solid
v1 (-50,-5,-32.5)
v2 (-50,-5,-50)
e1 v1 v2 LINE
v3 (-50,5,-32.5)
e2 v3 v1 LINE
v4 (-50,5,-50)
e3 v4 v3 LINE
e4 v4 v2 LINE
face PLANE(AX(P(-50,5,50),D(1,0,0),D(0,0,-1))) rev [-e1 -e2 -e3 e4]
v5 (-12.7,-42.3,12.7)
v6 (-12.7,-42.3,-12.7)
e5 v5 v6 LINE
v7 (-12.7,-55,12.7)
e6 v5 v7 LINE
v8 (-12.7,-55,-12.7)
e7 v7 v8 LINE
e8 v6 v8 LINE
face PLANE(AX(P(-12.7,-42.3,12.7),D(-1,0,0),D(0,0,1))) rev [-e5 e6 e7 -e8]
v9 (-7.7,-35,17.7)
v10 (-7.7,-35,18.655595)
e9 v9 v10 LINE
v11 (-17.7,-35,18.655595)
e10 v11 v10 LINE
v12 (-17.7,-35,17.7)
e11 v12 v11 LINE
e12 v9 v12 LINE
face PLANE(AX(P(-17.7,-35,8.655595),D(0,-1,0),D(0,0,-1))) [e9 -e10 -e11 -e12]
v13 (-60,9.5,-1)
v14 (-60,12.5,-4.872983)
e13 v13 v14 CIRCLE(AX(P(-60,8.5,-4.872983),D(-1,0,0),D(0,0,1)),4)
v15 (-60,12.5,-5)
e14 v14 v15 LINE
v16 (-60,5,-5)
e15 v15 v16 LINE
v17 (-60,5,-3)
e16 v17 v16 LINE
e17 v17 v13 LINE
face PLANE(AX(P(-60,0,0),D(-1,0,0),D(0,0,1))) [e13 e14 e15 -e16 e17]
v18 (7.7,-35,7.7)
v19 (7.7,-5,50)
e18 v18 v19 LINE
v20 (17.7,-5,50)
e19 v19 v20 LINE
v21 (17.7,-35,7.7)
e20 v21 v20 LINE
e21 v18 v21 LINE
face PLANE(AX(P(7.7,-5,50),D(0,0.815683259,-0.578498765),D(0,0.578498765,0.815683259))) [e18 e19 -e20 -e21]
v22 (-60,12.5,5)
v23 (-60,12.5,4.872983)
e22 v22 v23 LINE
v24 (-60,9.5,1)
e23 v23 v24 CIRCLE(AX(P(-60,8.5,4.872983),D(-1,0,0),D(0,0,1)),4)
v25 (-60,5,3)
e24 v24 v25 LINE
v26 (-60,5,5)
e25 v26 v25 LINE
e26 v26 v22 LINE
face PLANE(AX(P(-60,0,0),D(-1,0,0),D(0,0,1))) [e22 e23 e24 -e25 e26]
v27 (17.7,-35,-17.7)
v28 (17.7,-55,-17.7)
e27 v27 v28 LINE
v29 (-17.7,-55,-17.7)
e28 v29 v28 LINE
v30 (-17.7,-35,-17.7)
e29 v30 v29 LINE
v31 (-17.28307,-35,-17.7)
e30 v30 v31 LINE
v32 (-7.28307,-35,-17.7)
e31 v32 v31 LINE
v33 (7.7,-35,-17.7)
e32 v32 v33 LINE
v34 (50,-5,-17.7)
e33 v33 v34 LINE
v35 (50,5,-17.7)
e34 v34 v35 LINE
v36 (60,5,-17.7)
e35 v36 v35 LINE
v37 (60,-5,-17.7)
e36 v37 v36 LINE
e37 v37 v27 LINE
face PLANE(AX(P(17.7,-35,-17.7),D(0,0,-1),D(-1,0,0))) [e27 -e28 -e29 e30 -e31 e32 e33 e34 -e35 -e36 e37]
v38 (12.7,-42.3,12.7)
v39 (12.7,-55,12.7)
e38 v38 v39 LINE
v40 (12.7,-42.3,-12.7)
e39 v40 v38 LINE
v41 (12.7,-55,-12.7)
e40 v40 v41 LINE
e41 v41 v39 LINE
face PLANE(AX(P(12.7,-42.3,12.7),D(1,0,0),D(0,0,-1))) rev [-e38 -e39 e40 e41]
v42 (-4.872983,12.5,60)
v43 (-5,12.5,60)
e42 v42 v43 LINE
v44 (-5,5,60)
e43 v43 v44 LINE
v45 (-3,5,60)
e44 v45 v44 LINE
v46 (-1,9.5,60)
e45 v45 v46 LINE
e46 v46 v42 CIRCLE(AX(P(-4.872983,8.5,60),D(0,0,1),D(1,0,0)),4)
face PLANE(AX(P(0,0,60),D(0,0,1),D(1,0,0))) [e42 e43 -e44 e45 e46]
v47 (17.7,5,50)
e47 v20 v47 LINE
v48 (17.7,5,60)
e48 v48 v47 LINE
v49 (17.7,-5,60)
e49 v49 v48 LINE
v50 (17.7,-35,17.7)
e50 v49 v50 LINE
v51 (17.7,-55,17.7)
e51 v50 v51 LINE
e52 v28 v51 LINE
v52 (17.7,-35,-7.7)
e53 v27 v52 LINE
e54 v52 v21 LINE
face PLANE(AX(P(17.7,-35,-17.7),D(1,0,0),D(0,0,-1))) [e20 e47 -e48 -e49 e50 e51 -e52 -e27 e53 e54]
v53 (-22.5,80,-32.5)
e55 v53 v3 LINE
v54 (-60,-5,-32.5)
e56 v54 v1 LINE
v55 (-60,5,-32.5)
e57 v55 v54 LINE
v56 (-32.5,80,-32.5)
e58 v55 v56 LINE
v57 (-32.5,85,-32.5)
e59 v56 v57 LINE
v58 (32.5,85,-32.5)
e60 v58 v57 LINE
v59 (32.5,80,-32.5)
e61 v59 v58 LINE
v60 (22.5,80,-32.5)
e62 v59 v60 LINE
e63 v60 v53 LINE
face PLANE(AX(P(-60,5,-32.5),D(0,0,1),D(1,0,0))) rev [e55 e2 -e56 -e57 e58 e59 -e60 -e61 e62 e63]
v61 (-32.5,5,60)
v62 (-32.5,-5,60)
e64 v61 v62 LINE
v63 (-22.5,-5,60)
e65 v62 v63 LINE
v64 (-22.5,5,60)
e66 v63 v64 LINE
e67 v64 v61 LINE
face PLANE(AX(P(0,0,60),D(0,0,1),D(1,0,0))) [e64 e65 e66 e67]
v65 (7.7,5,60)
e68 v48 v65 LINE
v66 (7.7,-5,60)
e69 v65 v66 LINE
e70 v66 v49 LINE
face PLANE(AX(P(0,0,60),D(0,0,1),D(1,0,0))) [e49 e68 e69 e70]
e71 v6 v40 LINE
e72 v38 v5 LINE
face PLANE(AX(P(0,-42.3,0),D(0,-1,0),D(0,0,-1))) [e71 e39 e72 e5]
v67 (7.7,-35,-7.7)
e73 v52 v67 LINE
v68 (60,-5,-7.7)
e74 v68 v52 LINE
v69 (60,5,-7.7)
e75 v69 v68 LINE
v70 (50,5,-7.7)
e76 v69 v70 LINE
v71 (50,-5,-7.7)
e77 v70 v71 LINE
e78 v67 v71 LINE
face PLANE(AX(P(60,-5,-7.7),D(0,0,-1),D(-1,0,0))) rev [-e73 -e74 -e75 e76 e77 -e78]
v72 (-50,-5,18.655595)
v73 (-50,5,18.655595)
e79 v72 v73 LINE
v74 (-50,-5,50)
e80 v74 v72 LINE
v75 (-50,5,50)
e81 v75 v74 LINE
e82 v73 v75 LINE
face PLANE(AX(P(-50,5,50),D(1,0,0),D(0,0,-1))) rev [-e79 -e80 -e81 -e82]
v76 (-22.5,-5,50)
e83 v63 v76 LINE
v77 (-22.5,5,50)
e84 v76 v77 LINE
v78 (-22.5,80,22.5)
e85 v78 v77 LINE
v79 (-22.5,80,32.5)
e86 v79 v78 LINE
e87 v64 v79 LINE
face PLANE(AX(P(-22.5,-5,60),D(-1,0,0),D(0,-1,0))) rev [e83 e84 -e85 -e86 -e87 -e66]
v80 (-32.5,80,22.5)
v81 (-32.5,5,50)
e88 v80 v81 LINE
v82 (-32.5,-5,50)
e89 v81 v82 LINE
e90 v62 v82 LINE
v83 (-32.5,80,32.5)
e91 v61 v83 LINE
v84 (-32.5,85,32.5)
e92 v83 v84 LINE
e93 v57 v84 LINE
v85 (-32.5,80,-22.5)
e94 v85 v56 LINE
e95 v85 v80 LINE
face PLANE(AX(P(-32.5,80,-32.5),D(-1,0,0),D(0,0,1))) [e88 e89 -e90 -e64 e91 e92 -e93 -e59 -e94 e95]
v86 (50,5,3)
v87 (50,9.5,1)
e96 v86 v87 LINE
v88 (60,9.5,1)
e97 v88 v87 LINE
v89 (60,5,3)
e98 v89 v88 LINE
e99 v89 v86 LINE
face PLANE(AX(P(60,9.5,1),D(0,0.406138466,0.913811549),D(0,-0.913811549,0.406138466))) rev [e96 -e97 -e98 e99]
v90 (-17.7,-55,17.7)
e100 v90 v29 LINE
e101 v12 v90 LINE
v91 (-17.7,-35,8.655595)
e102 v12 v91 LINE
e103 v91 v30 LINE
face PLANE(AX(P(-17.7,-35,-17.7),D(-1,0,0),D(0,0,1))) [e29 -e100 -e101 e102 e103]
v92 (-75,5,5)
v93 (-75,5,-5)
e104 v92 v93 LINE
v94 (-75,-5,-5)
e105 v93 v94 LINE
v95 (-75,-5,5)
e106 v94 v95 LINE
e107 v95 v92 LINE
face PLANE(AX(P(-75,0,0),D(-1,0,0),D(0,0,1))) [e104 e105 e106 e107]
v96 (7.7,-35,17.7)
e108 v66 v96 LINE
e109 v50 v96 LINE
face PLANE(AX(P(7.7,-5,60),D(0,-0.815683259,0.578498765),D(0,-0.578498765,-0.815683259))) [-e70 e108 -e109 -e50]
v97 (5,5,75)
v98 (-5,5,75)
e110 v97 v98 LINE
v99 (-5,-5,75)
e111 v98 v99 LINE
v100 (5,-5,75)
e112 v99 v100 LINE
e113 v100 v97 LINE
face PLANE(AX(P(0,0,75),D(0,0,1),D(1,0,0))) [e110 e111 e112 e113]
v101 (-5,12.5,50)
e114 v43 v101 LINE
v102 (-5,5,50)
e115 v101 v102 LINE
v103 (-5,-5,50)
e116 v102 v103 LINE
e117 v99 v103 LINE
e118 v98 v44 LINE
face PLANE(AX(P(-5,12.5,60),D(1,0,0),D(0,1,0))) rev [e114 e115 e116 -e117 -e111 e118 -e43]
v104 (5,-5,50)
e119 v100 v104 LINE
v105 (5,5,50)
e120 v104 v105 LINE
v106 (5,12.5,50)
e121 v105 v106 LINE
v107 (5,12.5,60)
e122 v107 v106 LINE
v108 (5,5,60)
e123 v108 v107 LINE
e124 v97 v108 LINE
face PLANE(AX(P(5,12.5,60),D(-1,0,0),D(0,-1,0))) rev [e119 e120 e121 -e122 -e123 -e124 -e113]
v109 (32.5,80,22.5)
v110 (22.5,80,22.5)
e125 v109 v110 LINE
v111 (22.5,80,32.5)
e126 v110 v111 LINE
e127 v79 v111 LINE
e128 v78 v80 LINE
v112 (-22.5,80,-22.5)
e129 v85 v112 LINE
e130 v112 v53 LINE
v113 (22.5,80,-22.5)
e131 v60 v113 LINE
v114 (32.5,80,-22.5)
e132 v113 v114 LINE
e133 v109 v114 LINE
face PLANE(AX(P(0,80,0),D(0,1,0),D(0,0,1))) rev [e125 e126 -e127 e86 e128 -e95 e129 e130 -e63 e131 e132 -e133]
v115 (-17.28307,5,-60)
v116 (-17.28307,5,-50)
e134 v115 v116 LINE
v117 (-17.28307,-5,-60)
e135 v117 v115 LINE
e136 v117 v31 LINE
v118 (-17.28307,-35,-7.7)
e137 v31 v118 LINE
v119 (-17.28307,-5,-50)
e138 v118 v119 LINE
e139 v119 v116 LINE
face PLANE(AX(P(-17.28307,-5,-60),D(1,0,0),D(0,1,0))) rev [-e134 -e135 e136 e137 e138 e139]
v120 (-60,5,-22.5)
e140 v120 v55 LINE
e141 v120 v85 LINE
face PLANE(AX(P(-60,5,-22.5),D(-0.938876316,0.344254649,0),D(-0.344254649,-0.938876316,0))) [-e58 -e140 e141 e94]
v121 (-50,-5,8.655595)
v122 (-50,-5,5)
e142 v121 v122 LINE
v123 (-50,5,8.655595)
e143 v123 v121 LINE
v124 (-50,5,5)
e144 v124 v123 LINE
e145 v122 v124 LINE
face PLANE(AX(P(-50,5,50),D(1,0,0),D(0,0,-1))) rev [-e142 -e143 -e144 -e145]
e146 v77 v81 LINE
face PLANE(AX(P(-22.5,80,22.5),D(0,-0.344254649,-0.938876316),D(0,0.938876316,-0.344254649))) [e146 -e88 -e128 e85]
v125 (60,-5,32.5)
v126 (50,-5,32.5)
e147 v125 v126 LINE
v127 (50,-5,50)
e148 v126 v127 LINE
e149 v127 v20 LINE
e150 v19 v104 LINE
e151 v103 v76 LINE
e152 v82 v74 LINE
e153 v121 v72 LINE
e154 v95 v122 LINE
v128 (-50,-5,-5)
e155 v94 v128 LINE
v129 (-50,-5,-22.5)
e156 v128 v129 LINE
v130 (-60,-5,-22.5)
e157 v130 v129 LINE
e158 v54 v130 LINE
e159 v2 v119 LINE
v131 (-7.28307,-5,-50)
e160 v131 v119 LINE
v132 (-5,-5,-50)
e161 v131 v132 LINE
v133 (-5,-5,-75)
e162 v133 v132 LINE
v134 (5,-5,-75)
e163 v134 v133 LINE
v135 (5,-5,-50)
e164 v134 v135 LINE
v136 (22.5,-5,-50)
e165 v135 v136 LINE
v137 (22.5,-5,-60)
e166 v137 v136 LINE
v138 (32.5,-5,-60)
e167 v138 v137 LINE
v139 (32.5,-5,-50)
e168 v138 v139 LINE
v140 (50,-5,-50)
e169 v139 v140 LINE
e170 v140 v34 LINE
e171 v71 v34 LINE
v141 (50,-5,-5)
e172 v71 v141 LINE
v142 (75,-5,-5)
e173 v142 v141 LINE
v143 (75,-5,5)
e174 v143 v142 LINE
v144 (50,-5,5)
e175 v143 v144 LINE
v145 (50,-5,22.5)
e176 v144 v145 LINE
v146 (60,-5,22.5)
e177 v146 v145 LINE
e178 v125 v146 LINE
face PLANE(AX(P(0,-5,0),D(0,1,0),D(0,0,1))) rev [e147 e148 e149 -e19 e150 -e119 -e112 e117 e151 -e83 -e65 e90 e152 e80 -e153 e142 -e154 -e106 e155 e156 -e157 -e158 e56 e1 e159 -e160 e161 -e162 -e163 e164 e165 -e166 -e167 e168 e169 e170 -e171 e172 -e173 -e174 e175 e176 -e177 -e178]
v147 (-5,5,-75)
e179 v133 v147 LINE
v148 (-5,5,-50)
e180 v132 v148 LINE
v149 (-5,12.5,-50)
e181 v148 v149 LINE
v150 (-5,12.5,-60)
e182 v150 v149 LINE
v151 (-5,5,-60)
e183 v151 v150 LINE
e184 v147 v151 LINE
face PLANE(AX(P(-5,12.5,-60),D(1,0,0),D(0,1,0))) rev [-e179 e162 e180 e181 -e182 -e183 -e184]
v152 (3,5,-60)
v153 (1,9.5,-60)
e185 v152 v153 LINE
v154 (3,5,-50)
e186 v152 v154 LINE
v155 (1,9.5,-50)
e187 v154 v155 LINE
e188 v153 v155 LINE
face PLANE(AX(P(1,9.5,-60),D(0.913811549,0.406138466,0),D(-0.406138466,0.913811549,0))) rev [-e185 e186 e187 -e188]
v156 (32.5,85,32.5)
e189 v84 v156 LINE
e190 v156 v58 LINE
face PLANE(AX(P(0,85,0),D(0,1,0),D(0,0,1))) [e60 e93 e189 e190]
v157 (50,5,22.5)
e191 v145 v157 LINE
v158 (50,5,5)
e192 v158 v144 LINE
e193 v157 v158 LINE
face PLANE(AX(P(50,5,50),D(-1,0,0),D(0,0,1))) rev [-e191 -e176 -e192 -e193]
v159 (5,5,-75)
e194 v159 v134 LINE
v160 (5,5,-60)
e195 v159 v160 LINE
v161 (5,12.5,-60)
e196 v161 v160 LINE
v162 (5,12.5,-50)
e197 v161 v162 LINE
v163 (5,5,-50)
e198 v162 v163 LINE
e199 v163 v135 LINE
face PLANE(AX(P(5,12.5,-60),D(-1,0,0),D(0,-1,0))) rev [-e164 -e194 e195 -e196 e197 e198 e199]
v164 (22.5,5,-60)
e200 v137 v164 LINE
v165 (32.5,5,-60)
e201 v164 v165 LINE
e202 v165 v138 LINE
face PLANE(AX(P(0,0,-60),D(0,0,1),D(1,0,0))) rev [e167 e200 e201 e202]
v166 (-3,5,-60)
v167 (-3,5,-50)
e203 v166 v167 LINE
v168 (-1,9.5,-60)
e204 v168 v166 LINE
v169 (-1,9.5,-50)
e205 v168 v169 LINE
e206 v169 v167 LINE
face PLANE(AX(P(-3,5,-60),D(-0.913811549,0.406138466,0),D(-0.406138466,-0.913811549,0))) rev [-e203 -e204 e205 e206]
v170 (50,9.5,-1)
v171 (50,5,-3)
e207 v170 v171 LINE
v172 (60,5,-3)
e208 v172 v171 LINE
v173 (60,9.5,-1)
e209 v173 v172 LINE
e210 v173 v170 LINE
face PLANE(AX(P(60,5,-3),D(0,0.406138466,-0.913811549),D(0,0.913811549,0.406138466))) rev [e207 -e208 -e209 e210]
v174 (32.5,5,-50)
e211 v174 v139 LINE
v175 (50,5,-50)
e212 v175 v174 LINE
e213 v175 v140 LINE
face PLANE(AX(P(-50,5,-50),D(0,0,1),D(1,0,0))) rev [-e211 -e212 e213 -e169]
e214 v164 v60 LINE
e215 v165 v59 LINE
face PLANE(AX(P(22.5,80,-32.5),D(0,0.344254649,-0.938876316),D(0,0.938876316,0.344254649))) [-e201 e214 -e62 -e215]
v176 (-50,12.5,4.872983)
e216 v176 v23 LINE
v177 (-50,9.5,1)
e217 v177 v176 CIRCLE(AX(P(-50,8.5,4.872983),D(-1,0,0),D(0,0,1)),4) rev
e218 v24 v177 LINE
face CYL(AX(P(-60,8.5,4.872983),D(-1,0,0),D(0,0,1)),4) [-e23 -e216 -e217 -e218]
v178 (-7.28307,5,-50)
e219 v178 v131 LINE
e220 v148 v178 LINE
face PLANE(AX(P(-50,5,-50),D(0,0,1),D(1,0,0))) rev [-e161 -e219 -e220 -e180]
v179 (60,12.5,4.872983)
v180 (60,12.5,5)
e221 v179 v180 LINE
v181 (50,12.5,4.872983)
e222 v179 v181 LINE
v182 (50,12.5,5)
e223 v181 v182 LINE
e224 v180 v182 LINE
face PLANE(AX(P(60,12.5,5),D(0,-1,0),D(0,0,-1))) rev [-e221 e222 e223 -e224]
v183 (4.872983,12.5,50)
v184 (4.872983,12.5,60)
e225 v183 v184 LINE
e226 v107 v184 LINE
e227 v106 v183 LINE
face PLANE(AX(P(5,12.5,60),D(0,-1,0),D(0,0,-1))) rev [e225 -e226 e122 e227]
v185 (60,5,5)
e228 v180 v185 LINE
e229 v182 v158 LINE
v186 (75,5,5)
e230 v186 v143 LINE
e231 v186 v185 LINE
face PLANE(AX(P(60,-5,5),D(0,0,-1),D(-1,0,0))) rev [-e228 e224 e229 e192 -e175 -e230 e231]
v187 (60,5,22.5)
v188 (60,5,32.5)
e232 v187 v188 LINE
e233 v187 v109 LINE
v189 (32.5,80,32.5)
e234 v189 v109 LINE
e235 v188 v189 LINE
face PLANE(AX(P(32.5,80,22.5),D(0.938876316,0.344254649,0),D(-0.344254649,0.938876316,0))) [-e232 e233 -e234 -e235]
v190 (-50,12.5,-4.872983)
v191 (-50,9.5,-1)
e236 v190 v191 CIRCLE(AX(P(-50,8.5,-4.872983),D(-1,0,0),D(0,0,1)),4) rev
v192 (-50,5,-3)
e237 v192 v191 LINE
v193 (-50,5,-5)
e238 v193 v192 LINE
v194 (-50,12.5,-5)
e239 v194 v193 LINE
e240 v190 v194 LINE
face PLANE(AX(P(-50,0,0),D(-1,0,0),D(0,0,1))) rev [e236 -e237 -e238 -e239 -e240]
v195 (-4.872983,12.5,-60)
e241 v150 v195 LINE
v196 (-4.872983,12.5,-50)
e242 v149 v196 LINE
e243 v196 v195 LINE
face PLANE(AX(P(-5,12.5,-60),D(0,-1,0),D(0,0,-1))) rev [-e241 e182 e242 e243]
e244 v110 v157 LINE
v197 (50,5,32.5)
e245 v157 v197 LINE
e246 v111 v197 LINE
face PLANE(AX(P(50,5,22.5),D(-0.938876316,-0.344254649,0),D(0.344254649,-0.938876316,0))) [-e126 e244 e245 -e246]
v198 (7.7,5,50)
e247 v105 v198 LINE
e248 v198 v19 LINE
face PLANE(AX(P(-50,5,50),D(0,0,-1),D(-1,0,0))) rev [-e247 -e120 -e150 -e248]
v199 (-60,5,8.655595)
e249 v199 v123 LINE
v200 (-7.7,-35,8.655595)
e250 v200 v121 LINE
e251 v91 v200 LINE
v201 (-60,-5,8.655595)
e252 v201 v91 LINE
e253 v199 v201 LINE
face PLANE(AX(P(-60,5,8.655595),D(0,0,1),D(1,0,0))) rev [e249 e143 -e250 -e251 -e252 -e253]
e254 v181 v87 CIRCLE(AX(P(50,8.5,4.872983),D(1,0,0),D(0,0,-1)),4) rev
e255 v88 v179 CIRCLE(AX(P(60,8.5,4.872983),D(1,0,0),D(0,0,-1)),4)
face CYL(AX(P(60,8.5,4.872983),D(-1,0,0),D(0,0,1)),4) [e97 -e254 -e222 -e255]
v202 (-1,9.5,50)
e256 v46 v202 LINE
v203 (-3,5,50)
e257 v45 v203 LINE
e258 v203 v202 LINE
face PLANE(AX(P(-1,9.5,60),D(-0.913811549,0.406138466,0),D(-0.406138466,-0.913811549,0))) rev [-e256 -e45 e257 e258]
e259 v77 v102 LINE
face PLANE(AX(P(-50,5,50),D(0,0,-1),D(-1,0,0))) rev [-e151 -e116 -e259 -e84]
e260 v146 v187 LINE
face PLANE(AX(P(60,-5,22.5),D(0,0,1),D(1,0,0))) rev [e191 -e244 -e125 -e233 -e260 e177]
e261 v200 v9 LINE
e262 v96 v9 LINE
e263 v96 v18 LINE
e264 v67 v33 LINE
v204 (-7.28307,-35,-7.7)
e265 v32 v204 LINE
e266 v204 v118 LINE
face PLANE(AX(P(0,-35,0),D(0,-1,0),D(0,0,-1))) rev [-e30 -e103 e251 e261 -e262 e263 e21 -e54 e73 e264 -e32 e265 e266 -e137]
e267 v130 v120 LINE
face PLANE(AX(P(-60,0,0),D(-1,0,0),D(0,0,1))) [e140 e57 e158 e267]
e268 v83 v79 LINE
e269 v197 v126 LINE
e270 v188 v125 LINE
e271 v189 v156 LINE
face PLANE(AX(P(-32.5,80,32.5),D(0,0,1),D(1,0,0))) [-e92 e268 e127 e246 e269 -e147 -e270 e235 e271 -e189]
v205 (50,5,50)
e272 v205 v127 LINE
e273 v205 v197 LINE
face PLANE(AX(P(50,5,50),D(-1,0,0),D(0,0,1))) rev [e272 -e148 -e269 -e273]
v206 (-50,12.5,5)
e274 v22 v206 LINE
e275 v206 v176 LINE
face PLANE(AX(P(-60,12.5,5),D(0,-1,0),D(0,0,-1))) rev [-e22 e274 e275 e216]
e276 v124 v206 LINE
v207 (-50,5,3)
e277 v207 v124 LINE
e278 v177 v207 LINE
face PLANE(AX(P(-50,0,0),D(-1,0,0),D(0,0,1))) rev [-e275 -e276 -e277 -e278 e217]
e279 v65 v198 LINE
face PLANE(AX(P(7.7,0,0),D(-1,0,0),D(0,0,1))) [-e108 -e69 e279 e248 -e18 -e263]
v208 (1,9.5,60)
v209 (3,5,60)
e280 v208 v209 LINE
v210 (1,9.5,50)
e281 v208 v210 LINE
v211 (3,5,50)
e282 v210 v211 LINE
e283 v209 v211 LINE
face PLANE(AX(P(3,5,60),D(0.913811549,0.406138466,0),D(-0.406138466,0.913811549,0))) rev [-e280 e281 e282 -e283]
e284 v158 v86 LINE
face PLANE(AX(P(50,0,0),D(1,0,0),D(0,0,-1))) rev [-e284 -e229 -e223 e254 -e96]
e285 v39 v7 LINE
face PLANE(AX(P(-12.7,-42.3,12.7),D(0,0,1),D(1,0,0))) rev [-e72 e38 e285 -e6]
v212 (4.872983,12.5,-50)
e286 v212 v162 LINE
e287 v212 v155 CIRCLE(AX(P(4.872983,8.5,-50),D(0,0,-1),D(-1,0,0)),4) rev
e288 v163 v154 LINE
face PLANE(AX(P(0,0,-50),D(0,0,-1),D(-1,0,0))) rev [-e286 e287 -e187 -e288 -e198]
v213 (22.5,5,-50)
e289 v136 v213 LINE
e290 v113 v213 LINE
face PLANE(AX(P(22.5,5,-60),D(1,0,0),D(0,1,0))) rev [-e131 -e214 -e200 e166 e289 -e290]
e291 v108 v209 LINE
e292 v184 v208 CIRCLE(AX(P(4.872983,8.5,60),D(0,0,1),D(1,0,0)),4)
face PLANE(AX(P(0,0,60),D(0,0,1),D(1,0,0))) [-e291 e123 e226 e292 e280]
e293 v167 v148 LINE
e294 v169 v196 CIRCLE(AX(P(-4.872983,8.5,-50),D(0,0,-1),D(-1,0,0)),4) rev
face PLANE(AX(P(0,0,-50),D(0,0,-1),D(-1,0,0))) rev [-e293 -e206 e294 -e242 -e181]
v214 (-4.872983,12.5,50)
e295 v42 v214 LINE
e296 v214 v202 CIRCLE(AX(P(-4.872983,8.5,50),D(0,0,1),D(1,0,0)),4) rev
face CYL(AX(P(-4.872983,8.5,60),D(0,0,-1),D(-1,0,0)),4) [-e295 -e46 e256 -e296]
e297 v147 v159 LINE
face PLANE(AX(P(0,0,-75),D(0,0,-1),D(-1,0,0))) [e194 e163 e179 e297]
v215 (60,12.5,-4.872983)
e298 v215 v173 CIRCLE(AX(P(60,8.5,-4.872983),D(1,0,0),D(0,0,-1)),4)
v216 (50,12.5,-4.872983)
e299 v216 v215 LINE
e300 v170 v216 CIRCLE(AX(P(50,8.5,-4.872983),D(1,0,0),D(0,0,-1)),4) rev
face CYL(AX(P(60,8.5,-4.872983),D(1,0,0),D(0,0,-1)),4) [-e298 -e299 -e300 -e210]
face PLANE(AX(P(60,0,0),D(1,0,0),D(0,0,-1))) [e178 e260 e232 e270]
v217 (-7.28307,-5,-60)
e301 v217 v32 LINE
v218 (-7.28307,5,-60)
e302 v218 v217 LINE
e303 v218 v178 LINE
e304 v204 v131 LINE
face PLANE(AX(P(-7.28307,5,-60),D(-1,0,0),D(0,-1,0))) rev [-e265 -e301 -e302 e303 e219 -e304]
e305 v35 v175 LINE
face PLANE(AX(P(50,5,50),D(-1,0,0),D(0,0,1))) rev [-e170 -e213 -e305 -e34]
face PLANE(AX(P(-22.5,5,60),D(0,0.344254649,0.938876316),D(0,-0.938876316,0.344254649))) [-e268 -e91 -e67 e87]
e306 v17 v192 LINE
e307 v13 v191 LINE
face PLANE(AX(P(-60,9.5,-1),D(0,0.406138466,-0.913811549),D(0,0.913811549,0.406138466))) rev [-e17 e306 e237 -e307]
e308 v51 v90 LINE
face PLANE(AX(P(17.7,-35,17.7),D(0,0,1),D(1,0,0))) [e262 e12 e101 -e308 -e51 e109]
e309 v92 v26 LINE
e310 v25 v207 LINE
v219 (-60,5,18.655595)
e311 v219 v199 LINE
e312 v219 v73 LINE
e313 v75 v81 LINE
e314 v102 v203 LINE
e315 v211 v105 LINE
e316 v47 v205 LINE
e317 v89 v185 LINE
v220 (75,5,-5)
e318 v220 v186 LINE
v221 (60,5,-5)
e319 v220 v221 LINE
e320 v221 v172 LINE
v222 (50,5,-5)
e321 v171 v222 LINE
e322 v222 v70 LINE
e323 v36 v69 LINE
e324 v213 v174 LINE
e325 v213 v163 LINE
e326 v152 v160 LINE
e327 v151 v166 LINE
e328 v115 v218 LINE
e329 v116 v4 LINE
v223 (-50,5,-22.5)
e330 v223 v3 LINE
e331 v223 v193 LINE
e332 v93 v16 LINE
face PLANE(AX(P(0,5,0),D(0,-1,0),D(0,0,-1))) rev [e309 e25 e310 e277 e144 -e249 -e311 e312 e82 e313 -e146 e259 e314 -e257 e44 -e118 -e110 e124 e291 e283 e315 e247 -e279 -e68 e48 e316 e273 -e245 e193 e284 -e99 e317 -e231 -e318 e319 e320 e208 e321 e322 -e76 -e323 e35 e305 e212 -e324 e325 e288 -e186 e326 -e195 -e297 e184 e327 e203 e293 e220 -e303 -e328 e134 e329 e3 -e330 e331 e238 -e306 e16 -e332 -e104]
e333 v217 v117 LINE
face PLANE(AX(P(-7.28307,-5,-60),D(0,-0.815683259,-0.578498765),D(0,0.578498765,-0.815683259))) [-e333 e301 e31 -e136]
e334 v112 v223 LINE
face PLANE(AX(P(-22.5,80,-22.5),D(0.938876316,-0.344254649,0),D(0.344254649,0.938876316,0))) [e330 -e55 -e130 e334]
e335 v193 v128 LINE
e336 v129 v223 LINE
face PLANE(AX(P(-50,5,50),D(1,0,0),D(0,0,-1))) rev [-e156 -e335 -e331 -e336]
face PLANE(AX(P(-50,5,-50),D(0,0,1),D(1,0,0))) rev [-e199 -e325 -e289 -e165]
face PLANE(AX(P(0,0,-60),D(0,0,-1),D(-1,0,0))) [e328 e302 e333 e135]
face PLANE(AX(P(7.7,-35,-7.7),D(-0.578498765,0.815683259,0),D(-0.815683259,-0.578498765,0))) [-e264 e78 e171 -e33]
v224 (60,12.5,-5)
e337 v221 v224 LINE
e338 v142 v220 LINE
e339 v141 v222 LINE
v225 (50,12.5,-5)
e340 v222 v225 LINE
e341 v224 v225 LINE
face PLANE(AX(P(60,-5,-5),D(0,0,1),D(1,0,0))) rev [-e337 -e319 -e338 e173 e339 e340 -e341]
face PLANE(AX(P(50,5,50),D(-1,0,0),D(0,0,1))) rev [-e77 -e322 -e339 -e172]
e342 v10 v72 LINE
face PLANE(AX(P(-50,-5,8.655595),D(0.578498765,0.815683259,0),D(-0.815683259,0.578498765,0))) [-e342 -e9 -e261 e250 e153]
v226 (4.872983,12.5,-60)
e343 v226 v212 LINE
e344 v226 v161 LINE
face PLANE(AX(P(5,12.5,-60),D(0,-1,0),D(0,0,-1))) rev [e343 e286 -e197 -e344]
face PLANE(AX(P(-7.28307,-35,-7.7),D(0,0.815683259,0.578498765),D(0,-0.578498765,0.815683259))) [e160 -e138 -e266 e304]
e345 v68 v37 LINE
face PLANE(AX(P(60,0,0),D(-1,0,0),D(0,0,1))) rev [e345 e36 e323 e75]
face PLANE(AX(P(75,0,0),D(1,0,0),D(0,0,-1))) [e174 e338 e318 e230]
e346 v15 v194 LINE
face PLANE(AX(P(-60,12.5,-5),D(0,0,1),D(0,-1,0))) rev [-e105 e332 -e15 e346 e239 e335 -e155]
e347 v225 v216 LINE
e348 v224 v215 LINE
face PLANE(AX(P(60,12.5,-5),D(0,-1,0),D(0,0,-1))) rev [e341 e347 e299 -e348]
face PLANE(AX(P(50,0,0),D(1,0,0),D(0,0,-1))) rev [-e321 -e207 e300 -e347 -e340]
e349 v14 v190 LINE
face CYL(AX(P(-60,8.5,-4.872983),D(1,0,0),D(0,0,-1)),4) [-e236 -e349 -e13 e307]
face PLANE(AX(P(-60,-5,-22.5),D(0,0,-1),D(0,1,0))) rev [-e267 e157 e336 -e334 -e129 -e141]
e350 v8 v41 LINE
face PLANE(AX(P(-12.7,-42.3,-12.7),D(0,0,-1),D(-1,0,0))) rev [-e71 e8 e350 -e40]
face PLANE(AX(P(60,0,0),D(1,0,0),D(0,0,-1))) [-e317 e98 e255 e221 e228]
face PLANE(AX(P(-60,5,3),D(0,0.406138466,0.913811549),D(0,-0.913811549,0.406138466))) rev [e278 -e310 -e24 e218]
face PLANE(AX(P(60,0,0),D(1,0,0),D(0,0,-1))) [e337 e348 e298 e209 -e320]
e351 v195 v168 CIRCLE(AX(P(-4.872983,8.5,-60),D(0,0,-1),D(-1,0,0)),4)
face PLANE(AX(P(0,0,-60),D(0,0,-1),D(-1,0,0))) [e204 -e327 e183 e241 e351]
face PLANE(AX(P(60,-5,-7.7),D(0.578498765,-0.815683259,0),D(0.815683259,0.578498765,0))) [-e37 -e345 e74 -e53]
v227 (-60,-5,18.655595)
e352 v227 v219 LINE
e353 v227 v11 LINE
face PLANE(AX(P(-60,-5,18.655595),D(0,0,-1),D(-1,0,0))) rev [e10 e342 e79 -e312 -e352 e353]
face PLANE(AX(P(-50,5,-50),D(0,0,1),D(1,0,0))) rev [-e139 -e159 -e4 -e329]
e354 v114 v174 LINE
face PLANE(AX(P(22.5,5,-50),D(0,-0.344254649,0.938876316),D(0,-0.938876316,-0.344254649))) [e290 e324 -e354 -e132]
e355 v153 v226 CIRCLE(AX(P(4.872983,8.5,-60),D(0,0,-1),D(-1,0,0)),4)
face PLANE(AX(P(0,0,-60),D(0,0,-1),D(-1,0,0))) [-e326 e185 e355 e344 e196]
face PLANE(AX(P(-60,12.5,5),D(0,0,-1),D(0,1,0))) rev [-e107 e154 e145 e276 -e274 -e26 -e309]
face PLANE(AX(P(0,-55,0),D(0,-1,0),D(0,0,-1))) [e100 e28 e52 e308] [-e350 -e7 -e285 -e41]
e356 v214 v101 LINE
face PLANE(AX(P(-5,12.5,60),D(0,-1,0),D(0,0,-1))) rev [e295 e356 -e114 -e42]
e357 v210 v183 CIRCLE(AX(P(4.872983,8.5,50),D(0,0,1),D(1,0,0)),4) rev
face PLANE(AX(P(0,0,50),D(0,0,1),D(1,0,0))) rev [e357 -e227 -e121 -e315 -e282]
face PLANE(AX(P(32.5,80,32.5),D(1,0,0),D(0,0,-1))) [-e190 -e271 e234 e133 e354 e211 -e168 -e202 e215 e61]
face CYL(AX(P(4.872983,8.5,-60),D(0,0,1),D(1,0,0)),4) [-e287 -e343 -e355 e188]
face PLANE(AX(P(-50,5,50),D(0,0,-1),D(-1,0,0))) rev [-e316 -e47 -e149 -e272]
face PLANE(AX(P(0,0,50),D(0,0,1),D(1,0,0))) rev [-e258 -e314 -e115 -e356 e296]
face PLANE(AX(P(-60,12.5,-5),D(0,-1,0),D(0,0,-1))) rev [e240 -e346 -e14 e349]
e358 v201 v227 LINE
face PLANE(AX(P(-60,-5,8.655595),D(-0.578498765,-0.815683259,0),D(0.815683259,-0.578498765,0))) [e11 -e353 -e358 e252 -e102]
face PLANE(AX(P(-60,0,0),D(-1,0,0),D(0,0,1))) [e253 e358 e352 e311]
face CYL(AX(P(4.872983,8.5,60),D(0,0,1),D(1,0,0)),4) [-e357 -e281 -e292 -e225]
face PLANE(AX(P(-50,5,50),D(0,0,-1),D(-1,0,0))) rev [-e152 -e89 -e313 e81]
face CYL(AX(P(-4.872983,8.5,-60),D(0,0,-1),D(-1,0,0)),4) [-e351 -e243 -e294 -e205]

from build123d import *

# Parameters (mm, degrees)
SKETCH2_W            = 100
SKETCH2_H            = 100
BOSS_EXTRUDE1_DEPTH  = 5
SKETCH3_W            = 100
SKETCH3_H            = 100
BOSS_EXTRUDE2_DEPTH  = 5
SKETCH8_R            = 5
BOSS_EXTRUDE7_DEPTH  = 30
BOSS_EXTRUDE21_DEPTH = 10
FILLET14_R           = 4
FILLET13_R           = 4
SKETCH24_W           = 10
SKETCH24_H           = 10
BOSS_EXTRUDE22_DEPTH = 15
BOSS_EXTRUDE25_DEPTH = 10
SKETCH26_W           = 10
SKETCH26_H           = 10
BOSS_EXTRUDE26_DEPTH = 15
FILLET18_R           = 4
FILLET17_R           = 4
BOSS_EXTRUDE23_DEPTH = 10
SKETCH25_W           = 10
SKETCH25_H           = 10
BOSS_EXTRUDE24_DEPTH = 15
FILLET15_R           = 4
FILLET16_R           = 4
BOSS_EXTRUDE10_DEPTH = 10
FILLET19_R           = 4
SKETCH27_W           = 10
SKETCH27_H           = 10
BOSS_EXTRUDE27_DEPTH = 15
FILLET20_R           = 4
SKETCH33_W           = 65
SKETCH33_H           = 65
BOSS_EXTRUDE29_DEPTH = 5
BOSS_EXTRUDE28_DEPTH = 10
BOSS_EXTRUDE32_DEPTH = 10
BOSS_EXTRUDE34_DEPTH = 10
BOSS_EXTRUDE35_DEPTH = 10
BOSS_EXTRUDE31_DEPTH = 10
BOSS_EXTRUDE33_DEPTH = 10
BOSS_EXTRUDE36_DEPTH = 10
BOSS_EXTRUDE37_DEPTH = 10
SKETCH46_W           = 28.272110448
SKETCH46_H           = 20.427935106
CUT_EXTRUDE1_DEPTH   = 30
SKETCH47_W           = 35.4
SKETCH47_H           = 35.4
BOSS_EXTRUDE38_DEPTH = 20
SKETCH49_W           = 25.4
SKETCH49_H           = 25.4
CUT_EXTRUDE2_DEPTH   = 12.7
SKETCH51_W           = 10
SKETCH51_H           = 10
BOSS_EXTRUDE39_DEPTH = 10
BOSS_EXTRUDE40_DEPTH = 10
SKETCH54_W           = 10
SKETCH54_H           = 10
BOSS_EXTRUDE41_DEPTH = 10
BOSS_EXTRUDE42_DEPTH = 10
SKETCH56_W           = 10
SKETCH56_H           = 10
BOSS_EXTRUDE43_DEPTH = 10
BOSS_EXTRUDE47_DEPTH = 10
SKETCH59_W           = 10
SKETCH59_H           = 10
BOSS_EXTRUDE48_DEPTH = 10
BOSS_EXTRUDE52_DEPTH = 10


with BuildPart() as part:
    # Sketch2 → Boss-Extrude1 (new body)
    with BuildSketch(Plane(origin=(0, 0, 0), x_dir=(1, 0, 0), z_dir=(0, 1, 0))):
        Rectangle(SKETCH2_W, SKETCH2_H)
    extrude(amount=BOSS_EXTRUDE1_DEPTH)

    # Sketch3 → Boss-Extrude2 (add)
    with BuildSketch(Plane.XZ):
        Rectangle(SKETCH3_W, SKETCH3_H)
    extrude(amount=BOSS_EXTRUDE2_DEPTH)

    # Sketch8 → Boss-Extrude7 (add)
    with BuildSketch(Plane.XZ.offset(5)):
        with Locations(Location((0, 0, 0), (0, 0, 90))):
            Circle(SKETCH8_R)
    extrude(amount=BOSS_EXTRUDE7_DEPTH)

    # Sketch11 → Boss-Extrude21 (add)
    with BuildSketch(Plane(origin=(50, 0, 0), x_dir=(0, 0, -1), z_dir=(1, 0, 0))):
        Polygon((5, -5), (5, 12.5), (1, 12.5), (1, 9.5), (3, 5), (-3, 5), (-1, 9.5), (-1, 12.5), (-5, 12.5), (-5, -5), align=None)
    extrude(amount=BOSS_EXTRUDE21_DEPTH)

    # Fillet14
    # the kernel refuses this fillet: 4 mm, written as the material it takes off along each edge
    with BuildSketch(Plane(origin=(40.317541634, 12.5, -1), x_dir=(0, -1, 0), z_dir=(1, 0, 0))) as fillet14_piece_1:
        with BuildLine():
            CenterArc((4, 3.872983346), FILLET14_R, 180, 75.522487814)
            Line((0, 3.872983346), (-0.08, 3.872983346))
            Line((-0.08, 3.872983346), (-0.08, 0))
            Line((-0.08, 0), (0, -0.08))
            ThreePointArc((0, -0.08), (1.5, -0.08), (2.98, -0.077459667))
            Line((2.98, -0.077459667), (3, 0))
        make_face()
    extrude(amount=29.364916731, mode=Mode.SUBTRACT)

    # Fillet13
    # the kernel refuses this fillet: 4 mm, written as the material it takes off along each edge
    with BuildSketch(Plane(origin=(40.317541634, 12.5, 1), x_dir=(0, 0, 1), z_dir=(1, 0, 0))) as fillet13_piece_1:
        with BuildLine():
            CenterArc((3.872983346, 4), FILLET13_R, 194.477512186, 75.522487814)
            Line((0, 3), (-0.077459667, 2.98))
            ThreePointArc((-0.077459667, 2.98), (-0.08, 1.5), (-0.08, 0))
            Line((-0.08, 0), (0, -0.08))
            Line((0, -0.08), (3.872983346, -0.08))
            Line((3.872983346, -0.08), (3.872983346, 0))
        make_face()
    extrude(amount=29.364916731, mode=Mode.SUBTRACT)

    # Sketch24 → Boss-Extrude22 (add)
    with BuildSketch(Plane(origin=(60, 0, 0), x_dir=(0, 0, -1), z_dir=(1, 0, 0))):
        Rectangle(SKETCH24_W, SKETCH24_H)
    extrude(amount=BOSS_EXTRUDE22_DEPTH)

    # Sketch13 → Boss-Extrude25 (add)
    with BuildSketch(Plane.ZY.offset(50)):
        Polygon((-5, 12.5), (-5, -5), (5, -5), (5, 12.5), (1, 12.5), (1, 9.5), (3, 5), (-3, 5), (-1, 9.5), (-1, 12.5), align=None)
    extrude(amount=BOSS_EXTRUDE25_DEPTH)

    # Sketch26 → Boss-Extrude26 (add)
    with BuildSketch(Plane.ZY.offset(60)):
        Rectangle(SKETCH26_W, SKETCH26_H)
    extrude(amount=BOSS_EXTRUDE26_DEPTH)

    # Fillet18
    # the kernel refuses this fillet: 4 mm, written as the material it takes off along each edge
    with BuildSketch(Plane(origin=(-40.317541634, 12.5, 1), x_dir=(0, -1, 0), z_dir=(-1, 0, 0))) as fillet18_piece_1:
        with BuildLine():
            CenterArc((4, 3.872983346), FILLET18_R, 180, 75.522487814)
            Line((0, 3.872983346), (-0.08, 3.872983346))
            Line((-0.08, 3.872983346), (-0.08, 0))
            Line((-0.08, 0), (0, -0.08))
            ThreePointArc((0, -0.08), (1.5, -0.08), (2.98, -0.077459667))
            Line((2.98, -0.077459667), (3, 0))
        make_face()
    extrude(amount=29.364916731, mode=Mode.SUBTRACT)

    # Fillet17
    # the kernel refuses this fillet: 4 mm, written as the material it takes off along each edge
    with BuildSketch(Plane(origin=(-40.317541634, 12.5, -1), x_dir=(0, 0, -1), z_dir=(-1, 0, 0))) as fillet17_piece_1:
        with BuildLine():
            CenterArc((3.872983346, 4), FILLET17_R, 194.477512186, 75.522487814)
            Line((0, 3), (-0.077459667, 2.98))
            ThreePointArc((-0.077459667, 2.98), (-0.08, 1.5), (-0.08, 0))
            Line((-0.08, 0), (0, -0.08))
            Line((0, -0.08), (3.872983346, -0.08))
            Line((3.872983346, -0.08), (3.872983346, 0))
        make_face()
    extrude(amount=29.364916731, mode=Mode.SUBTRACT)

    # Sketch14 → Boss-Extrude23 (add)
    with BuildSketch(Plane(origin=(0, 0, -50), x_dir=(-1, 0, 0), z_dir=(0, 0, -1))):
        Polygon((-5, 12.5), (-1, 12.5), (-1, 9.5), (-3, 5), (3, 5), (1, 9.5), (1, 12.5), (5, 12.5), (5, -5), (-5, -5), align=None)
    extrude(amount=BOSS_EXTRUDE23_DEPTH)

    # Sketch25 → Boss-Extrude24 (add)
    with BuildSketch(Plane(origin=(0, 0, -60), x_dir=(-1, 0, 0), z_dir=(0, 0, -1))):
        Rectangle(SKETCH25_W, SKETCH25_H)
    extrude(amount=BOSS_EXTRUDE24_DEPTH)

    # Fillet15
    # the kernel refuses this fillet: 4 mm, written as the material it takes off along each edge
    with BuildSketch(Plane(origin=(-1, 12.5, -40.317541634), x_dir=(0, -1, 0), z_dir=(0, 0, -1))) as fillet15_piece_1:
        with BuildLine():
            CenterArc((4, 3.872983346), FILLET15_R, 180, 75.522487814)
            Line((0, 3.872983346), (-0.08, 3.872983346))
            Line((-0.08, 3.872983346), (-0.08, 0))
            Line((-0.08, 0), (0, -0.08))
            ThreePointArc((0, -0.08), (1.5, -0.08), (2.98, -0.077459667))
            Line((2.98, -0.077459667), (3, 0))
        make_face()
    extrude(amount=29.364916731, mode=Mode.SUBTRACT)

    # Fillet16
    # the kernel refuses this fillet: 4 mm, written as the material it takes off along each edge
    with BuildSketch(Plane(origin=(1, 12.5, -40.317541634), x_dir=(0, -1, 0), z_dir=(0, 0, -1))) as fillet16_piece_1:
        with BuildLine():
            CenterArc((4, -3.872983346), FILLET16_R, 104.477512186, 75.522487814)
            Line((0, -3.872983346), (-0.08, -3.872983346))
            Line((-0.08, -3.872983346), (-0.08, 0))
            Line((-0.08, 0), (0, 0.08))
            ThreePointArc((0, 0.08), (1.5, 0.08), (2.98, 0.077459667))
            Line((2.98, 0.077459667), (3, 0))
        make_face()
    extrude(amount=29.364916731, mode=Mode.SUBTRACT)

    # Sketch12 → Boss-Extrude10 (add)
    with BuildSketch(Plane.XY.offset(50)):
        Polygon((-5, 12.5), (-5, -5), (5, -5), (5, 12.5), (1, 12.5), (1, 9.5), (3, 5), (-3, 5), (-1, 9.5), (-1, 12.5), align=None)
    extrude(amount=BOSS_EXTRUDE10_DEPTH)

    # Fillet19
    # the kernel refuses this fillet: 4 mm, written as the material it takes off along each edge
    with BuildSketch(Plane(origin=(-1, 12.5, 40.317541634), x_dir=(-1, 0, 0), z_dir=(0, 0, 1))) as fillet19_piece_1:
        with BuildLine():
            CenterArc((3.872983346, 4), FILLET19_R, 194.477512186, 75.522487814)
            Line((0, 3), (-0.077459667, 2.98))
            ThreePointArc((-0.077459667, 2.98), (-0.08, 1.5), (-0.08, 0))
            Line((-0.08, 0), (0, -0.08))
            Line((0, -0.08), (3.872983346, -0.08))
            Line((3.872983346, -0.08), (3.872983346, 0))
        make_face()
    extrude(amount=29.364916731, mode=Mode.SUBTRACT)

    # Sketch27 → Boss-Extrude27 (add)
    with BuildSketch(Plane.XY.offset(60)):
        Rectangle(SKETCH27_W, SKETCH27_H)
    extrude(amount=BOSS_EXTRUDE27_DEPTH)

    # Fillet20
    # the kernel refuses this fillet: 4 mm, written as the material it takes off along each edge
    with BuildSketch(Plane(origin=(1, 12.5, 40.317541634), x_dir=(1, 0, 0), z_dir=(0, 0, 1))) as fillet20_piece_1:
        with BuildLine():
            CenterArc((3.872983346, -4), FILLET20_R, 90, 75.522487814)
            Line((0, -3), (-0.077459667, -2.98))
            ThreePointArc((-0.077459667, -2.98), (-0.08, -1.5), (-0.08, 0))
            Line((-0.08, 0), (0, 0.08))
            Line((0, 0.08), (3.872983346, 0.08))
            Line((3.872983346, 0.08), (3.872983346, 0))
        make_face()
    extrude(amount=29.364916731, mode=Mode.SUBTRACT)

    # Sketch30 → Boss-Extrude28 (add)
    with BuildSketch(Plane.ZY.offset(50)):
        Polygon((-27.5, 5), (-22.5, 5), (-22.5, -5), (-32.5, -5), (-32.5, 5), align=None)
    extrude(amount=BOSS_EXTRUDE28_DEPTH)



with BuildPart() as body_2:
    # Sketch33 → Boss-Extrude29 (new body)
    with BuildSketch(Plane(origin=(0, 85, 0), x_dir=(1, 0, 0), z_dir=(0, 1, 0))):
        Rectangle(SKETCH33_W, SKETCH33_H)
    extrude(amount=-BOSS_EXTRUDE29_DEPTH)


with BuildPart() as part_1:
    add(part.part)

    add(body_2.part)  # Boss-Extrude32 merges body 2
    # Sketch40 → Boss-Extrude32 (add)
    with BuildSketch(Plane(origin=(0, 0, -32.5), x_dir=(-1, 0, 0), z_dir=(0, 0, -1))):
        Polygon((60, 5), (32.5, 80), (22.5, 80), (50, 5), align=None)
    extrude(amount=-BOSS_EXTRUDE32_DEPTH)

    # Sketch42 → Boss-Extrude34 (add)
    with BuildSketch(Plane(origin=(50, 0, 0), x_dir=(0, 0, -1), z_dir=(1, 0, 0))):
        Polygon((-27.5, 5), (-22.5, 5), (-22.5, -5), (-32.5, -5), (-32.5, 5), align=None)
    extrude(amount=BOSS_EXTRUDE34_DEPTH)

    # Sketch43 → Boss-Extrude35 (add)
    with BuildSketch(Plane.XY.offset(32.5)):
        Polygon((32.5, 80), (60, 5), (50, 5), (22.5, 80), align=None)
    extrude(amount=-BOSS_EXTRUDE35_DEPTH)

    # Sketch37 → Boss-Extrude31 (add)
    with BuildSketch(Plane.XY.offset(50)):
        Polygon((-27.5, 5), (-22.5, 5), (-22.5, -5), (-32.5, -5), (-32.5, 5), align=None)
    extrude(amount=BOSS_EXTRUDE31_DEPTH)

    # Sketch41 → Boss-Extrude33 (add)
    with BuildSketch(Plane.ZY.offset(32.5)):
        Polygon((60, 5), (32.5, 80), (22.5, 80), (50, 5), align=None)
    extrude(amount=-BOSS_EXTRUDE33_DEPTH)

    # Sketch44 → Boss-Extrude36 (add)
    with BuildSketch(Plane(origin=(0, 0, -50), x_dir=(-1, 0, 0), z_dir=(0, 0, -1))):
        Polygon((-27.5, 5), (-22.5, 5), (-22.5, -5), (-32.5, -5), (-32.5, 5), align=None)
    extrude(amount=BOSS_EXTRUDE36_DEPTH)

    # Sketch45 → Boss-Extrude37 (add)
    with BuildSketch(Plane(origin=(32.5, 0, 0), x_dir=(0, 0, -1), z_dir=(1, 0, 0))):
        Polygon((32.5, 80), (60, 5), (50, 5), (22.5, 80), align=None)
    extrude(amount=-BOSS_EXTRUDE37_DEPTH)

    # Sketch46 → Cut-Extrude1 (cut)
    with BuildSketch(Plane.XZ.offset(5)):
        Rectangle(SKETCH46_W, SKETCH46_H)
    extrude(amount=CUT_EXTRUDE1_DEPTH, mode=Mode.SUBTRACT)

    # Sketch51 → Boss-Extrude39 (add)
    with BuildSketch(Plane.XY.offset(50)):
        with Locations((12.7, 0)):
            Rectangle(SKETCH51_W, SKETCH51_H)
    extrude(amount=BOSS_EXTRUDE39_DEPTH)



with BuildPart() as body_2_2:
    # Sketch47 → Boss-Extrude38 (new body)
    with BuildSketch(Plane(origin=(0, -55, 0), x_dir=(-1, 0, 0), z_dir=(0, -1, 0))):
        Rectangle(SKETCH47_W, SKETCH47_H)
    extrude(amount=-BOSS_EXTRUDE38_DEPTH)

    # Sketch49 → Cut-Extrude2 (cut)
    with BuildSketch(Plane.XZ.offset(55)):
        Rectangle(SKETCH49_W, SKETCH49_H)
    extrude(amount=-CUT_EXTRUDE2_DEPTH, mode=Mode.SUBTRACT)


with BuildPart() as part_2:
    add(part_1.part)

    add(body_2_2.part)  # Boss-Extrude40 merges body 2 2
    # Sketch52 → Boss-Extrude40 (add)
    with BuildSketch(Plane(origin=(17.7, 0, 0), x_dir=(0, 0, -1), z_dir=(1, 0, 0))):
        Polygon((-60, -5), (-17.7, -35), (-7.7, -35), (-50, -5), align=None)
    extrude(amount=-BOSS_EXTRUDE40_DEPTH)

    # Sketch54 → Boss-Extrude41 (add)
    with BuildSketch(Plane(origin=(50, 0, 0), x_dir=(0, 0, -1), z_dir=(1, 0, 0))):
        with Locations((12.7, 0)):
            Rectangle(SKETCH54_W, SKETCH54_H)
    extrude(amount=BOSS_EXTRUDE41_DEPTH)

    # Sketch55 → Boss-Extrude42 (add)
    with BuildSketch(Plane(origin=(0, 0, -17.7), x_dir=(-1, 0, 0), z_dir=(0, 0, -1))):
        Polygon((-60, -5), (-17.7, -35), (-7.7, -35), (-50, -5), align=None)
    extrude(amount=-BOSS_EXTRUDE42_DEPTH)

    # Sketch56 → Boss-Extrude43 (add)
    with BuildSketch(Plane(origin=(0, 0, -50), x_dir=(-1, 0, 0), z_dir=(0, 0, -1))):
        with Locations((12.28306994, 0)):
            Rectangle(SKETCH56_W, SKETCH56_H)
    extrude(amount=BOSS_EXTRUDE43_DEPTH)

    # Sketch58 → Boss-Extrude47 (add)
    with BuildSketch(Plane.ZY.offset(17.28306994)):
        Polygon((-60, -5), (-17.7, -35), (-7.7, -35), (-50, -5), align=None)
    extrude(amount=-BOSS_EXTRUDE47_DEPTH)

    # Sketch59 → Boss-Extrude48 (add)
    with BuildSketch(Plane.ZY.offset(50)):
        with Locations((13.655595041, 0)):
            Rectangle(SKETCH59_W, SKETCH59_H)
    extrude(amount=BOSS_EXTRUDE48_DEPTH)

    # Sketch61 → Boss-Extrude52 (add)
    with BuildSketch(Plane.XY.offset(18.655595041)):
        Polygon((-60, -5), (-17.7, -35), (-7.7, -35), (-50, -5), align=None)
    extrude(amount=-BOSS_EXTRUDE52_DEPTH)


solid = part_2.part
